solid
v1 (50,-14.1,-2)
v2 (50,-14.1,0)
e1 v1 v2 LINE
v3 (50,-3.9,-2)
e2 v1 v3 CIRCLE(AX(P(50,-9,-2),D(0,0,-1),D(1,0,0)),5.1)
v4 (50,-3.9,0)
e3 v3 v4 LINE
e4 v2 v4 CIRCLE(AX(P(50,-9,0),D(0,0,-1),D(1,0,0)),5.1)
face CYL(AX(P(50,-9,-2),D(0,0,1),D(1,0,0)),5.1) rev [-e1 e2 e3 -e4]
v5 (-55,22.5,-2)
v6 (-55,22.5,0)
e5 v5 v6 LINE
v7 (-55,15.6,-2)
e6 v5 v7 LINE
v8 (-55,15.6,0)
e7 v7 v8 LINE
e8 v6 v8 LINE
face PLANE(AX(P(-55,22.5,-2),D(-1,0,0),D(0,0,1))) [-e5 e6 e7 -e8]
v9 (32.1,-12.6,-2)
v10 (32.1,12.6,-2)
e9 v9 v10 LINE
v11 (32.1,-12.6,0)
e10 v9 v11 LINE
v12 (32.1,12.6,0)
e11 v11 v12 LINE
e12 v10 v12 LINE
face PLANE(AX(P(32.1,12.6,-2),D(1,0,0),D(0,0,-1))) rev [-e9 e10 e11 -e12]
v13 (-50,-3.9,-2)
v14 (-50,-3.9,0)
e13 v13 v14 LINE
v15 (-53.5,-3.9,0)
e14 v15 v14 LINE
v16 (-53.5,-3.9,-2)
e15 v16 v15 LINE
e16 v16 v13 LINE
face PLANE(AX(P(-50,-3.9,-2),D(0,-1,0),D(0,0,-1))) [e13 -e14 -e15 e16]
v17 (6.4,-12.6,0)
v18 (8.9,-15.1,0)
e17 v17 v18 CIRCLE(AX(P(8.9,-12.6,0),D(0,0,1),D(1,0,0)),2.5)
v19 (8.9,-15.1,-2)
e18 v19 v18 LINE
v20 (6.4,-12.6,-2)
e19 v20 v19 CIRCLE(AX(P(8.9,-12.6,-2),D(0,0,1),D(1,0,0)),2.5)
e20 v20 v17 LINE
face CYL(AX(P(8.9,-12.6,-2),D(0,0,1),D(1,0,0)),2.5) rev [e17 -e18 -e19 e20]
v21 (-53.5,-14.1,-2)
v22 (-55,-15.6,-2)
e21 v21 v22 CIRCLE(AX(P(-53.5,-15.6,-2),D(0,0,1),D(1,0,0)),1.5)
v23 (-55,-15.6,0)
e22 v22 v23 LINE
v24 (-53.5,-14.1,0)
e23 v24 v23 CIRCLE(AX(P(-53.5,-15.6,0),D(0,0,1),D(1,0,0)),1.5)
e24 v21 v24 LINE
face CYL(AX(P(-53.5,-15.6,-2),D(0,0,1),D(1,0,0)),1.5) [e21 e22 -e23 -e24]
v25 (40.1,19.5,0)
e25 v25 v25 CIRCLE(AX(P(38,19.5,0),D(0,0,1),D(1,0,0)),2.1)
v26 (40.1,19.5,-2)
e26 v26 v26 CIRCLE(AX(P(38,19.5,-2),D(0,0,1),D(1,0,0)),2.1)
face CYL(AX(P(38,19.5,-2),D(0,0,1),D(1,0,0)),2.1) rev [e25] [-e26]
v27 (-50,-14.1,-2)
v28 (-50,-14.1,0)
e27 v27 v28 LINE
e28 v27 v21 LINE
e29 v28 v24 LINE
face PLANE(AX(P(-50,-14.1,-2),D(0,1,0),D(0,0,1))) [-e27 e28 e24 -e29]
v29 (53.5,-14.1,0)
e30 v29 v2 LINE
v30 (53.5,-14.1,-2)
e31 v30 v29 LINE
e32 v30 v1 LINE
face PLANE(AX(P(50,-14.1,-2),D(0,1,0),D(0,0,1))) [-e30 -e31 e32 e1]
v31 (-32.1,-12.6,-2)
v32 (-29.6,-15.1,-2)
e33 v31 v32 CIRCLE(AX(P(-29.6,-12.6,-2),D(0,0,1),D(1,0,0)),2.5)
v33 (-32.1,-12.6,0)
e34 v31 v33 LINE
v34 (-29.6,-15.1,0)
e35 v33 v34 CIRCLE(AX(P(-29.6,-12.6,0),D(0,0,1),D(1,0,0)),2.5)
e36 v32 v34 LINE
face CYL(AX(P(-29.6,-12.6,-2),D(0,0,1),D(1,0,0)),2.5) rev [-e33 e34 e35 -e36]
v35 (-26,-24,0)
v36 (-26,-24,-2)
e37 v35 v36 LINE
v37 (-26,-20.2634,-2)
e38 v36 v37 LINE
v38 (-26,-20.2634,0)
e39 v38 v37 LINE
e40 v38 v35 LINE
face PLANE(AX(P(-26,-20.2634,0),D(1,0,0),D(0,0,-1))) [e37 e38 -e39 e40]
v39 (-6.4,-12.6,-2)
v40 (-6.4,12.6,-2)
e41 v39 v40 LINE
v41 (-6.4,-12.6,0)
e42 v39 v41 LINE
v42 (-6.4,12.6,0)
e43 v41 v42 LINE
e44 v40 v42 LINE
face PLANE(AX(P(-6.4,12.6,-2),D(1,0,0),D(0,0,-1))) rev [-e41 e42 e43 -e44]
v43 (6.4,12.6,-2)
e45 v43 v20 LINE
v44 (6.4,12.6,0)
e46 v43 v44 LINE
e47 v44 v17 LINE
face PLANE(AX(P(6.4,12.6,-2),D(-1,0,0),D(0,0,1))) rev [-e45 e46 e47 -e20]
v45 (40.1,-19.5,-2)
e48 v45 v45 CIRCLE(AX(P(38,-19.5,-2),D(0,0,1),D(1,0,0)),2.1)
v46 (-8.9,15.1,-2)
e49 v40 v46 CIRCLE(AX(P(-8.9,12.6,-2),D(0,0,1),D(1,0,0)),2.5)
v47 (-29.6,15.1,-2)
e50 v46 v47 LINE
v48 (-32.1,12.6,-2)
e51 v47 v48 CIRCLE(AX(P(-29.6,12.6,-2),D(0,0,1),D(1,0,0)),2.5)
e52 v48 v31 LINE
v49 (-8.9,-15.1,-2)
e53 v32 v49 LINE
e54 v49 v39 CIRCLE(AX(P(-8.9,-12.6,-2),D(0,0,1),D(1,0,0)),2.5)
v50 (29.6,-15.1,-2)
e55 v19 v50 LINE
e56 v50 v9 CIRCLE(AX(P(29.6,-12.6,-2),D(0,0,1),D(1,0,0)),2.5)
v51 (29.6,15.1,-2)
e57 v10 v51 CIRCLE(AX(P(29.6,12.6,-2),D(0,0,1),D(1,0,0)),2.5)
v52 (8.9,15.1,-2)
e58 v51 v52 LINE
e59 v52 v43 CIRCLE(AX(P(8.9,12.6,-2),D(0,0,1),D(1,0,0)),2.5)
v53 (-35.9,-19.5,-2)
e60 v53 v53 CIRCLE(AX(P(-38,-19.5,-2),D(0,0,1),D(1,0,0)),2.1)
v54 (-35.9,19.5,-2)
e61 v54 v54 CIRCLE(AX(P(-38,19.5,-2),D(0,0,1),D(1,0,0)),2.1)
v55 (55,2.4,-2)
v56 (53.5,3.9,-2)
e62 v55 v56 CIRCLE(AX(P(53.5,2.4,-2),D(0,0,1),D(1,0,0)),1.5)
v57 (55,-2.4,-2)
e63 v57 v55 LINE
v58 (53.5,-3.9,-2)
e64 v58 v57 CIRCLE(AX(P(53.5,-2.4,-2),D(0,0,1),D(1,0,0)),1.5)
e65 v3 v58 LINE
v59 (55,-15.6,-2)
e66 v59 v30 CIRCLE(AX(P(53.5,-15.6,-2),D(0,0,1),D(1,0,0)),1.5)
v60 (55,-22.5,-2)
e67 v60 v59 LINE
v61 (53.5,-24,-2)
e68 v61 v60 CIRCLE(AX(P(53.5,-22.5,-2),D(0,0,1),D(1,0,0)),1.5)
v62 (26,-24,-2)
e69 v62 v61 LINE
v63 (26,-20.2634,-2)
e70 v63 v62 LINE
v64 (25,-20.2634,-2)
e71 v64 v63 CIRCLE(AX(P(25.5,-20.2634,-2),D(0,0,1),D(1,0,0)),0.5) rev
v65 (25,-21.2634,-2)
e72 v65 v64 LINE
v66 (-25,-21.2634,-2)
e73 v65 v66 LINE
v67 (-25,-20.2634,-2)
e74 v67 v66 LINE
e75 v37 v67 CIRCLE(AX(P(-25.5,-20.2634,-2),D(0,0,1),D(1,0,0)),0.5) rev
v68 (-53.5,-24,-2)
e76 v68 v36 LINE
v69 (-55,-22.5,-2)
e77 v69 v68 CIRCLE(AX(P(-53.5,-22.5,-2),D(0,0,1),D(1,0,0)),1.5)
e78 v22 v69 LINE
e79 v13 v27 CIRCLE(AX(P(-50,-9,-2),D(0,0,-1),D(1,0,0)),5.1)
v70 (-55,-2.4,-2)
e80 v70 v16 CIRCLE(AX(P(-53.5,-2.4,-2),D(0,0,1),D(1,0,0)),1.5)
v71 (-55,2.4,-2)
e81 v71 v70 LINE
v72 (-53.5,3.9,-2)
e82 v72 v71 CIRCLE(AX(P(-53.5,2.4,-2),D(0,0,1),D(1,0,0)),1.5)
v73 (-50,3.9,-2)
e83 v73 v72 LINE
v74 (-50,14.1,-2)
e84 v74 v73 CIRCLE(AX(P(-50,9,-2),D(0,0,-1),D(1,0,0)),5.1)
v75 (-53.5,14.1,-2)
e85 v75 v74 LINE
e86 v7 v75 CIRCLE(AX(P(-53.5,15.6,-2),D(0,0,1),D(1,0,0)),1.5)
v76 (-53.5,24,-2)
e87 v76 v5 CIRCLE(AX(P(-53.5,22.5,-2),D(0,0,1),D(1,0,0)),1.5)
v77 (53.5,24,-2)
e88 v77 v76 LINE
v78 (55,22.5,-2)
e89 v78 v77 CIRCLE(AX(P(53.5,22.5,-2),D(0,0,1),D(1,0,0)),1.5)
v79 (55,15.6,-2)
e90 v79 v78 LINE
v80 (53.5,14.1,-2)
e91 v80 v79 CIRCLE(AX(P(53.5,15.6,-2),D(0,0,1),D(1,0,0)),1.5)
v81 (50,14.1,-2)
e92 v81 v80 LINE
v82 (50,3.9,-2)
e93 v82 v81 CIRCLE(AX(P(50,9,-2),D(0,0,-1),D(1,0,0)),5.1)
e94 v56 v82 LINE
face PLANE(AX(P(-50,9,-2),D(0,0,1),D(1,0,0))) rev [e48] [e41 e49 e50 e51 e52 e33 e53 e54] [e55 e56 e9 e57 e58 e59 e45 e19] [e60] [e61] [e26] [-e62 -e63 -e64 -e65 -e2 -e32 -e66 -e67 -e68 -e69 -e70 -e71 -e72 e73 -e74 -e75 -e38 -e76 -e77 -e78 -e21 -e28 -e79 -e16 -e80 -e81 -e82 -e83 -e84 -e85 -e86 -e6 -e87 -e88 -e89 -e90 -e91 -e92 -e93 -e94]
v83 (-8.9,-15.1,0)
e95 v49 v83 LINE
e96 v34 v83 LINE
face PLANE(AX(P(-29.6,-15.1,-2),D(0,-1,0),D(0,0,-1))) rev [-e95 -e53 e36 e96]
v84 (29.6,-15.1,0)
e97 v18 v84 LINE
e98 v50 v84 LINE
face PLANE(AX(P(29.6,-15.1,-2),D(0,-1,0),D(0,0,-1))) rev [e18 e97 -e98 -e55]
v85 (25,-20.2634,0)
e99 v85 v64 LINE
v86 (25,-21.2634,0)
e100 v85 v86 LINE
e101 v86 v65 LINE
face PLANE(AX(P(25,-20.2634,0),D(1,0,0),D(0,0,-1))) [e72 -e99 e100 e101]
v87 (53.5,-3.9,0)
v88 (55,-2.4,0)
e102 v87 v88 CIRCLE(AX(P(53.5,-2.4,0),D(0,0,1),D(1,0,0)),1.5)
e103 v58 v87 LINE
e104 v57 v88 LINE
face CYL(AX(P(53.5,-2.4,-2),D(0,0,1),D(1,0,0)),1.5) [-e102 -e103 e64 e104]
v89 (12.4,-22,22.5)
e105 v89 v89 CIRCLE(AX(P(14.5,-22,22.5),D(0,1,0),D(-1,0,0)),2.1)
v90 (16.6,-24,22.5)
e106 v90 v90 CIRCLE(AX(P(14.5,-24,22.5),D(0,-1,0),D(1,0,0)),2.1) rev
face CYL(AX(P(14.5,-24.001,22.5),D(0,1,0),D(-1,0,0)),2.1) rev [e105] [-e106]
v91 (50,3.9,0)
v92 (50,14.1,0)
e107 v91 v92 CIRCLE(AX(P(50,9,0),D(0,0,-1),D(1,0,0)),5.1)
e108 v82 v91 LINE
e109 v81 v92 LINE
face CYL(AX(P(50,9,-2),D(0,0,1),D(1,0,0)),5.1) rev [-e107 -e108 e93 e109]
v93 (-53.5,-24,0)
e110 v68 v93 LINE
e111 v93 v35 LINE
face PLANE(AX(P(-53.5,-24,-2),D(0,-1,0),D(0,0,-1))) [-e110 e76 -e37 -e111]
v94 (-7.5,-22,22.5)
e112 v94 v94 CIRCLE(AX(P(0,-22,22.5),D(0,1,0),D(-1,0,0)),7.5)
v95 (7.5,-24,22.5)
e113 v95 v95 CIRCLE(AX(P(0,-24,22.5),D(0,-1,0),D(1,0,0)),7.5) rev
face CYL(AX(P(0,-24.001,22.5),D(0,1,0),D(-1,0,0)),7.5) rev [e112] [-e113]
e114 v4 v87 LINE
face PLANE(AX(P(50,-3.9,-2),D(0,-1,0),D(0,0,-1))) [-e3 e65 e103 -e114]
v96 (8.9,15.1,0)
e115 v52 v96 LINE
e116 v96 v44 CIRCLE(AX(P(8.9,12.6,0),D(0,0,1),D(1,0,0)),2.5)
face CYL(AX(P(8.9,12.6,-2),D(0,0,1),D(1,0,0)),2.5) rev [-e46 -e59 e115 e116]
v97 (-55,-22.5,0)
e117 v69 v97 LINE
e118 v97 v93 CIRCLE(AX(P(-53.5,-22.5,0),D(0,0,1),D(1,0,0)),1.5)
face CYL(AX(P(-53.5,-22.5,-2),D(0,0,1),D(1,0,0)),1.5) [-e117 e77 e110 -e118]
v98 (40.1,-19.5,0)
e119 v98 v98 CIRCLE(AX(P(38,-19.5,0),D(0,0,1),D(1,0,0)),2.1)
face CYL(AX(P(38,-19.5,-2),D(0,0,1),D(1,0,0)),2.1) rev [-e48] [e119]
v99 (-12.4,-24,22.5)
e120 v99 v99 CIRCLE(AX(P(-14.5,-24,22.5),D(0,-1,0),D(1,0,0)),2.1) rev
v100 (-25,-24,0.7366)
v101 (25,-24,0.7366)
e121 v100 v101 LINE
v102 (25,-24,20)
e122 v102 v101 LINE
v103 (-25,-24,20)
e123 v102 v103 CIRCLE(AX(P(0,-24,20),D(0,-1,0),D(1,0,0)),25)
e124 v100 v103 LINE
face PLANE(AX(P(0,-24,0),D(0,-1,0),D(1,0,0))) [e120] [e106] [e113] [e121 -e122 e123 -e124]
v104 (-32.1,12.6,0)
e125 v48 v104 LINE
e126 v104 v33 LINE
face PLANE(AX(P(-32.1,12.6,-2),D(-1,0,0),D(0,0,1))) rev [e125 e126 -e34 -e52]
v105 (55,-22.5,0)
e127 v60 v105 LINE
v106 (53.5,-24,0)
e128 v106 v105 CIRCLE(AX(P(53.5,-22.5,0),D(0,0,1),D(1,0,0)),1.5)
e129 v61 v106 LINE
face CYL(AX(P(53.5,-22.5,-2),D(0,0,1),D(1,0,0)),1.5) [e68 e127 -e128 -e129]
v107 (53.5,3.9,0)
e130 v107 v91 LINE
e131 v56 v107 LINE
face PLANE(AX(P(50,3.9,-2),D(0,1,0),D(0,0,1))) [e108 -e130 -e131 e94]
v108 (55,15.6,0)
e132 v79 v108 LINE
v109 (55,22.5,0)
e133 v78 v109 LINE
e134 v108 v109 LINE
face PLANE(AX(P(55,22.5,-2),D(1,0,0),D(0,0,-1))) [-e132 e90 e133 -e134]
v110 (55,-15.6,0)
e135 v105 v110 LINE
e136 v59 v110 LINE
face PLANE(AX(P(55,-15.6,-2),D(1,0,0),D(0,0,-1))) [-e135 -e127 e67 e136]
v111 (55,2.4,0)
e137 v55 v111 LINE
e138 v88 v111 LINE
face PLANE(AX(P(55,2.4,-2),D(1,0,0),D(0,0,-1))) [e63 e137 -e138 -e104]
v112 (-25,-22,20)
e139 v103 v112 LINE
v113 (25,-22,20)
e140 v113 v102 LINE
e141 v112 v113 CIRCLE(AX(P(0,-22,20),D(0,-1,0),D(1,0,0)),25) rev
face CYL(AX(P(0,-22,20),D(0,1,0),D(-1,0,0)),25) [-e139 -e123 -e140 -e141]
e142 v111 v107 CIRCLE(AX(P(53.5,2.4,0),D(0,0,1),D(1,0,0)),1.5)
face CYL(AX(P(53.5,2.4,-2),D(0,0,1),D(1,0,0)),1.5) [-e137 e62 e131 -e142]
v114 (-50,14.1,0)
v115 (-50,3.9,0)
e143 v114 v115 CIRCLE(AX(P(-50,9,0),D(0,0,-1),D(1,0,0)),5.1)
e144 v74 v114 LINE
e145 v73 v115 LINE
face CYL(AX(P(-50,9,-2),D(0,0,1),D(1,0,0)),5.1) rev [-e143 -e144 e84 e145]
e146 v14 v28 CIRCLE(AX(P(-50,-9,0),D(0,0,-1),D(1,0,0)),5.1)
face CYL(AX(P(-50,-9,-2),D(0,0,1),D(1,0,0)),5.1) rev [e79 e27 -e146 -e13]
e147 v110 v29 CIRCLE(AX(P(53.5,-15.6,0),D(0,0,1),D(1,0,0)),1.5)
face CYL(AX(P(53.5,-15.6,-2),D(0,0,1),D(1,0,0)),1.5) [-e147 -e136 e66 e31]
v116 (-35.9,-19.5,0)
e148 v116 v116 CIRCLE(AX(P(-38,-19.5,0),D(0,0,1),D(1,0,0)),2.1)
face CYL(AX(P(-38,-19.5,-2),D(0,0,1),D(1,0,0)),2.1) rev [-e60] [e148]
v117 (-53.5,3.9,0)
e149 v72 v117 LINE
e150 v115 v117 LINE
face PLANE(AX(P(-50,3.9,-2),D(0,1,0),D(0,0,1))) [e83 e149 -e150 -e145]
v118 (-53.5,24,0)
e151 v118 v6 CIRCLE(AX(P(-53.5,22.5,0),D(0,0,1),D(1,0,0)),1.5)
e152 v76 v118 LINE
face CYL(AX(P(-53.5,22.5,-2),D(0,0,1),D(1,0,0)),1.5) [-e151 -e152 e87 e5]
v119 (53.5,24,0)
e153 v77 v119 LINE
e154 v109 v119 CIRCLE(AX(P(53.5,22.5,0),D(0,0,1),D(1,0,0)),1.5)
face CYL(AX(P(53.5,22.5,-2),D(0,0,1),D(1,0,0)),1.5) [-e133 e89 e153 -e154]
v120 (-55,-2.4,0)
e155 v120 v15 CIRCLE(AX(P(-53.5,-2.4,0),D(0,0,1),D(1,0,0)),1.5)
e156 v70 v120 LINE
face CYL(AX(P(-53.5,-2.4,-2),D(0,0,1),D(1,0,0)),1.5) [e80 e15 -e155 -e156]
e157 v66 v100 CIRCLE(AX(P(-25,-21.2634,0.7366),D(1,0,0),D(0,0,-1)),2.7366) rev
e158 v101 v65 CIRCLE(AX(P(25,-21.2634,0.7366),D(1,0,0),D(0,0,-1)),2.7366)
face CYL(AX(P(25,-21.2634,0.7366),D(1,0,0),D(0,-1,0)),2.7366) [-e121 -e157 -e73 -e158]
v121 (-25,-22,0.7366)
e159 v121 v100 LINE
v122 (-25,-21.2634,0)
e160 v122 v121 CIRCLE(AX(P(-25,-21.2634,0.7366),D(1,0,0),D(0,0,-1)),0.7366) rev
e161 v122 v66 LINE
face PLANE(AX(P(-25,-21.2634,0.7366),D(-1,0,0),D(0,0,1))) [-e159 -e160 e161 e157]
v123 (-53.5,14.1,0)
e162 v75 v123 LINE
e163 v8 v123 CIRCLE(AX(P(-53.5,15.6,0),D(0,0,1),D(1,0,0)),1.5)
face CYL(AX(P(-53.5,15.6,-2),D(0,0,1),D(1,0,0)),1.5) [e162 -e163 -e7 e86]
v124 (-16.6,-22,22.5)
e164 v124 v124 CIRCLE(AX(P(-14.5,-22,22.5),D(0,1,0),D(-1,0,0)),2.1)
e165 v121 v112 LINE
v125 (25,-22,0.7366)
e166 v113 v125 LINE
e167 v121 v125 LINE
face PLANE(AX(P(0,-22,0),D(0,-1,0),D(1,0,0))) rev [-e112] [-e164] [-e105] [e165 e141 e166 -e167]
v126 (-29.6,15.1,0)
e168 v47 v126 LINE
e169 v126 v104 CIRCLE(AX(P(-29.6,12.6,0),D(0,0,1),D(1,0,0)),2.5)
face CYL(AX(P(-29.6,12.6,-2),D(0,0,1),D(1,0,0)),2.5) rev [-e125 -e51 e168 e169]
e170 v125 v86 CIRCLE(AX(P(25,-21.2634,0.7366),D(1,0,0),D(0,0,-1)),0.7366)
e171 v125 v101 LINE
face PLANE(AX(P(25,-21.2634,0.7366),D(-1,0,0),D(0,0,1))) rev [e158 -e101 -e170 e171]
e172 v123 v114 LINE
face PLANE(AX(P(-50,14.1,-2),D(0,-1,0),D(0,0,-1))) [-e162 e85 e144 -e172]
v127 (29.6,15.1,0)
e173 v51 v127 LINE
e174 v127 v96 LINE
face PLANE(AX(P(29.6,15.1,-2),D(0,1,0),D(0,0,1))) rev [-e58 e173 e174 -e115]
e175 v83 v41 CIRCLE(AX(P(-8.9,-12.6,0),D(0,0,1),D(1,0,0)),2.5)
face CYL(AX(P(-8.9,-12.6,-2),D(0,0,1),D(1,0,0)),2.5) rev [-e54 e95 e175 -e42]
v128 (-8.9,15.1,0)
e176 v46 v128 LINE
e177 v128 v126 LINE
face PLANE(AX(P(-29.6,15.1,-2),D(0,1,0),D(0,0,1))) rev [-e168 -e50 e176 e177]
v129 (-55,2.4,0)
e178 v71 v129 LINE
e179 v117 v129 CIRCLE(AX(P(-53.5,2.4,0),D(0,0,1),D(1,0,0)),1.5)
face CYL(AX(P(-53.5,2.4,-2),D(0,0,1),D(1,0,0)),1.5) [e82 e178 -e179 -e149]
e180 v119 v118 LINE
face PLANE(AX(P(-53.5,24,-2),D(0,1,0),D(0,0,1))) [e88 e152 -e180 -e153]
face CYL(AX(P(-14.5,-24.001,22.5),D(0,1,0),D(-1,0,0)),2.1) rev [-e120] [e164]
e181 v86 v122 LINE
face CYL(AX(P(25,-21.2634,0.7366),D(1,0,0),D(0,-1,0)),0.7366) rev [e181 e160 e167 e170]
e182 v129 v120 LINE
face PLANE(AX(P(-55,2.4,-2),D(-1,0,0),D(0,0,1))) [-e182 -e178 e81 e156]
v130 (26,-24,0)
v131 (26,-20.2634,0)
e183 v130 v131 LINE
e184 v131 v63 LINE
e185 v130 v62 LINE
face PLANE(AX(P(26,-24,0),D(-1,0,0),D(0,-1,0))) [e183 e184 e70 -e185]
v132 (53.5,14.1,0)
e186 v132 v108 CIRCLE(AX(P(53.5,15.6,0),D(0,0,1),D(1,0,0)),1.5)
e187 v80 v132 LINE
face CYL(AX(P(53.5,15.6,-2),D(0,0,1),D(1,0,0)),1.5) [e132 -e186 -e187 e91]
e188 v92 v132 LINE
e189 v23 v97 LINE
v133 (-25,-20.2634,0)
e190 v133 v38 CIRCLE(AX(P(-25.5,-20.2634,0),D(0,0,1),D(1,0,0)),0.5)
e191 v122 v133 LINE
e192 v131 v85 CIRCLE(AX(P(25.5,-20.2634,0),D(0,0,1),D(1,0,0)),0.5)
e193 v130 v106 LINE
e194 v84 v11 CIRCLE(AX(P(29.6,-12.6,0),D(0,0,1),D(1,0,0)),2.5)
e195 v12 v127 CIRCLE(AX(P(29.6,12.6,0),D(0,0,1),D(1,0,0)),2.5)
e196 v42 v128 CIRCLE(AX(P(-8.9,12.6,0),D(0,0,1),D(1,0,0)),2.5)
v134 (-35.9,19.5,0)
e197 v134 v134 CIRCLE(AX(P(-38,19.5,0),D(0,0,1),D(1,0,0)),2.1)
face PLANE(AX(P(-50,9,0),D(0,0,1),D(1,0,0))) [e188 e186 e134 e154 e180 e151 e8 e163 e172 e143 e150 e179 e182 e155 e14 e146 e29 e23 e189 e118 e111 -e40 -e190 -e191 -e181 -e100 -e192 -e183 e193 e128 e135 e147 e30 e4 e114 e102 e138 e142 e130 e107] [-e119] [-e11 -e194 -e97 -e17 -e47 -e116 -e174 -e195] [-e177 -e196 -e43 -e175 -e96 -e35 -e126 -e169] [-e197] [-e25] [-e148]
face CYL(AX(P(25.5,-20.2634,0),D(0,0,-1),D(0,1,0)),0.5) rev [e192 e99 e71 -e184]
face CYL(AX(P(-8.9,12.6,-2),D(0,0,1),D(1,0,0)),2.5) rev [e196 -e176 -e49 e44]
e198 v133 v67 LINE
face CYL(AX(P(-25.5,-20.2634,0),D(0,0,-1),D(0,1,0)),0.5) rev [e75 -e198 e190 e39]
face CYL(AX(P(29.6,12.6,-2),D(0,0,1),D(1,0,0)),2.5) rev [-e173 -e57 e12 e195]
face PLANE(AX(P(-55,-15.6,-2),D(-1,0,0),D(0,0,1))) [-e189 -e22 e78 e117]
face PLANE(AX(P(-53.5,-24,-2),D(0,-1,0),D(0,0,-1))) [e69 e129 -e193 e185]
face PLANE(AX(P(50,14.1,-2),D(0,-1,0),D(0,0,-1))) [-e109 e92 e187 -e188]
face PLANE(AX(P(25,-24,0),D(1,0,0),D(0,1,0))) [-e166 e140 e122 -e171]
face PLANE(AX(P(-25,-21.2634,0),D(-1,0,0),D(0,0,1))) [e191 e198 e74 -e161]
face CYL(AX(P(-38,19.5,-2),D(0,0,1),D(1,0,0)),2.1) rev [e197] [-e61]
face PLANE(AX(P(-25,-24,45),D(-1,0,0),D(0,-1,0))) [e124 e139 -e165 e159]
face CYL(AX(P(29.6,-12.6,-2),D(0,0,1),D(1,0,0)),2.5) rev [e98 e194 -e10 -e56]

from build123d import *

# Parameters (mm, degrees)
SKETCH1_R                = 2.1
BASE_FLANGE1_DEPTH       = 2
EDGE_FLANGE1_START       = -3
EDGE_FLANGE1_DEPTH       = 3.7366
EDGE_FLANGE1_START_2     = 0.7366
EDGE_FLANGE1_2_OUTLINE_W = 50
EDGE_FLANGE1_2_OUTLINE_H = 2
EDGE_FLANGE1_2_DEPTH     = 44.2634
EDGE_FLANGE1_START_3     = -25
EDGE_FLANGE1_3_DEPTH     = 50
EDGE_FLANGE1_4_DEPTH     = 50
FILLET1_RADIUS           = 25
FILLET1_LENGTH           = 2
CUT_EXTRUDE1_REACH       = 86.652
SKETCH9_R                = 7.5
SKETCH9_R_2              = 2.1


with BuildPart() as part:
    # Base-Flange1: sheet metal written as solids
    # Sketch1 → Base-Flange1 (new body)
    with BuildSketch(Plane.XY):
        with BuildLine():
            Line((-53.5, -24), (53.5, -24))
            ThreePointArc((53.5, -24), (54.560660172, -23.560660172), (55, -22.5))
            Line((55, -22.5), (55, -15.6))
            ThreePointArc((55, -15.6), (54.560660172, -14.539339828), (53.5, -14.1))
            Line((53.5, -14.1), (50, -14.1))
            ThreePointArc((50, -14.1), (44.9, -9), (50, -3.9))
            Line((50, -3.9), (53.5, -3.9))
            ThreePointArc((53.5, -3.9), (54.560660172, -3.460660172), (55, -2.4))
            Line((55, -2.4), (55, 2.4))
            ThreePointArc((55, 2.4), (54.560660172, 3.460660172), (53.5, 3.9))
            Line((53.5, 3.9), (50, 3.9))
            ThreePointArc((50, 3.9), (44.9, 9), (50, 14.1))
            Line((50, 14.1), (53.5, 14.1))
            ThreePointArc((53.5, 14.1), (54.560660172, 14.539339828), (55, 15.6))
            Line((55, 15.6), (55, 22.5))
            ThreePointArc((55, 22.5), (54.560660172, 23.560660172), (53.5, 24))
            Line((53.5, 24), (-53.5, 24))
            ThreePointArc((-53.5, 24), (-54.560660172, 23.560660172), (-55, 22.5))
            Line((-55, 22.5), (-55, 15.6))
            ThreePointArc((-55, 15.6), (-54.560660172, 14.539339828), (-53.5, 14.1))
            Line((-53.5, 14.1), (-50, 14.1))
            ThreePointArc((-50, 14.1), (-44.9, 9), (-50, 3.9))
            Line((-50, 3.9), (-53.5, 3.9))
            ThreePointArc((-53.5, 3.9), (-54.560660172, 3.460660172), (-55, 2.4))
            Line((-55, 2.4), (-55, -2.4))
            ThreePointArc((-55, -2.4), (-54.560660172, -3.460660172), (-53.5, -3.9))
            Line((-53.5, -3.9), (-50, -3.9))
            ThreePointArc((-50, -3.9), (-44.9, -9), (-50, -14.1))
            Line((-50, -14.1), (-53.5, -14.1))
            ThreePointArc((-53.5, -14.1), (-54.560660172, -14.539339828), (-55, -15.6))
            Line((-55, -15.6), (-55, -22.5))
            ThreePointArc((-55, -22.5), (-54.560660172, -23.560660172), (-53.5, -24))
        make_face()
        with Locations((-38, 19.5)):
            Circle(SKETCH1_R, mode=Mode.SUBTRACT)
        with Locations((-38, -19.5)):
            Circle(SKETCH1_R, mode=Mode.SUBTRACT)
        with Locations((38, 19.5)):
            Circle(SKETCH1_R, mode=Mode.SUBTRACT)
        with Locations((38, -19.5)):
            Circle(SKETCH1_R, mode=Mode.SUBTRACT)
        with BuildLine():
            Line((6.4, 12.6), (6.4, -12.6))
            ThreePointArc((6.4, -12.6), (7.132233047, -14.367766953), (8.9, -15.1))
            Line((8.9, -15.1), (29.6, -15.1))
            ThreePointArc((29.6, -15.1), (31.367766953, -14.367766953), (32.1, -12.6))
            Line((32.1, -12.6), (32.1, 12.6))
            ThreePointArc((32.1, 12.6), (31.367766953, 14.367766953), (29.6, 15.1))
            Line((29.6, 15.1), (8.9, 15.1))
            ThreePointArc((8.9, 15.1), (7.132233047, 14.367766953), (6.4, 12.6))
        make_face(mode=Mode.SUBTRACT)
        with BuildLine():
            Line((-6.4, 12.6), (-6.4, -12.6))
            ThreePointArc((-6.4, -12.6), (-7.132233047, -14.367766953), (-8.9, -15.1))
            Line((-8.9, -15.1), (-29.6, -15.1))
            ThreePointArc((-29.6, -15.1), (-31.367766953, -14.367766953), (-32.1, -12.6))
            Line((-32.1, -12.6), (-32.1, 12.6))
            ThreePointArc((-32.1, 12.6), (-31.367766953, 14.367766953), (-29.6, 15.1))
            Line((-29.6, 15.1), (-8.9, 15.1))
            ThreePointArc((-8.9, 15.1), (-7.132233047, 14.367766953), (-6.4, 12.6))
        make_face(mode=Mode.SUBTRACT)
    extrude(amount=-BASE_FLANGE1_DEPTH)

    # Edge-Flange1: read off the stored shape, not the designer's step
    # Edge-Flange1 outline → Edge-Flange1 (cut)
    with BuildSketch(Plane.XY.offset(EDGE_FLANGE1_START)):
        with BuildLine():
            Line((-26, -24), (-25, -24))
            Line((-25, -24), (-25, -20.2634))
            ThreePointArc((-25, -20.2634), (-25.5, -19.7634), (-26, -20.2634))
            Line((-26, -20.2634), (-26, -24))
        make_face()
        with BuildLine():
            Line((25, -20.2634), (25, -24))
            Line((25, -24), (26, -24))
            Line((26, -24), (26, -20.2634))
            ThreePointArc((26, -20.2634), (25.5, -19.7634), (25, -20.2634))
        make_face()
    extrude(amount=EDGE_FLANGE1_DEPTH, mode=Mode.SUBTRACT)

    # Edge-Flange1 3 outline → Edge-Flange1 3 (cut)
    with BuildSketch(Plane.YZ.offset(EDGE_FLANGE1_START_3)):
        with BuildLine():
            ThreePointArc((-21.2634, -2), (-22.917667209, -1.443395312), (-23.899002398, 0))
            Line((-23.899002398, 0), (-24, 0))
            Line((-24, 0), (-24, -2))
            Line((-24, -2), (-21.2634, -2))
        make_face()
    extrude(amount=EDGE_FLANGE1_3_DEPTH, mode=Mode.SUBTRACT)



with BuildPart() as body_2:
    # Edge-Flange1 2 outline → Edge-Flange1 2 (new body)
    with BuildSketch(Plane.XY.offset(EDGE_FLANGE1_START_2)):
        with Locations((0, -23)):
            Rectangle(EDGE_FLANGE1_2_OUTLINE_W, EDGE_FLANGE1_2_OUTLINE_H)
    extrude(amount=EDGE_FLANGE1_2_DEPTH)


with BuildPart() as part_1:
    add(part.part)

    add(body_2.part)  # Edge-Flange1 4 merges body 2
    # Edge-Flange1 4 outline → Edge-Flange1 4 (add)
    with BuildSketch(Plane.YZ.offset(EDGE_FLANGE1_START_3)):
        with BuildLine():
            Line((-22, 0.7366), (-24, 0.7366))
            ThreePointArc((-24, 0.7366), (-23.974633029, 0.364854094), (-23.899002398, 0))
            Line((-23.899002398, 0), (-21.2634, 0))
            ThreePointArc((-21.2634, 0), (-21.784254855, 0.215745145), (-22, 0.7366))
        make_face()
    extrude(amount=EDGE_FLANGE1_4_DEPTH)

    # Fillet1: full round fillet: the end face becomes a half cylinder, R = half its width
    fillet1_face = Plane((0, -23, 45), x_dir=(0, -1, 0), z_dir=(0, 0, 1))  # on the end face: x along it, z out of the body
    fillet1_slab = fillet1_face.offset(-FILLET1_RADIUS / 2) * Box(FILLET1_LENGTH, 2 * FILLET1_RADIUS, FILLET1_RADIUS, mode=Mode.PRIVATE)  # the body's end, R deep
    fillet1_round = Plane((0, -23, 20), x_dir=(0, 0, 1), z_dir=(0, -1, 0)) * Cylinder(FILLET1_RADIUS, FILLET1_LENGTH, mode=Mode.PRIVATE)  # its axis R under the face
    add(fillet1_slab - fillet1_round, mode=Mode.SUBTRACT)

    # Sketch9 → Cut-Extrude1 (cut, up to next)
    with BuildSketch(Plane(origin=(0, -22, 0), x_dir=(1, 0, 0), z_dir=(0, 1, 0)), mode=Mode.PRIVATE) as cut_extrude1_sk1:
        with Locations(Location((0, -22.5, 0), (0, 0, 180))):
            Circle(SKETCH9_R)
    cut_extrude1_tool1 = extrude(cut_extrude1_sk1.sketch, amount=-CUT_EXTRUDE1_REACH, mode=Mode.PRIVATE) & part_1.part
    # Sketch9 → Cut-Extrude1 (cut, up to next)
    with BuildSketch(Plane(origin=(0, -22, 0), x_dir=(1, 0, 0), z_dir=(0, 1, 0)), mode=Mode.PRIVATE) as cut_extrude1_sk2:
        with Locations(Location((-14.5, -22.5, 0), (0, 0, 180))):
            Circle(SKETCH9_R_2)
    cut_extrude1_tool2 = extrude(cut_extrude1_sk2.sketch, amount=-CUT_EXTRUDE1_REACH, mode=Mode.PRIVATE) & part_1.part
    # Sketch9 → Cut-Extrude1 (cut, up to next)
    with BuildSketch(Plane(origin=(0, -22, 0), x_dir=(1, 0, 0), z_dir=(0, 1, 0)), mode=Mode.PRIVATE) as cut_extrude1_sk3:
        with Locations(Location((14.5, -22.5, 0), (0, 0, 180))):
            Circle(SKETCH9_R_2)
    cut_extrude1_tool3 = extrude(cut_extrude1_sk3.sketch, amount=-CUT_EXTRUDE1_REACH, mode=Mode.PRIVATE) & part_1.part
    add(cut_extrude1_tool1.solids().sort_by_distance((0, -22, 22.5))[0], mode=Mode.SUBTRACT)
    add(cut_extrude1_tool2.solids().sort_by_distance((-14.5, -22, 22.5))[0], mode=Mode.SUBTRACT)
    add(cut_extrude1_tool3.solids().sort_by_distance((14.5, -22, 22.5))[0], mode=Mode.SUBTRACT)


solid = part_1.part
